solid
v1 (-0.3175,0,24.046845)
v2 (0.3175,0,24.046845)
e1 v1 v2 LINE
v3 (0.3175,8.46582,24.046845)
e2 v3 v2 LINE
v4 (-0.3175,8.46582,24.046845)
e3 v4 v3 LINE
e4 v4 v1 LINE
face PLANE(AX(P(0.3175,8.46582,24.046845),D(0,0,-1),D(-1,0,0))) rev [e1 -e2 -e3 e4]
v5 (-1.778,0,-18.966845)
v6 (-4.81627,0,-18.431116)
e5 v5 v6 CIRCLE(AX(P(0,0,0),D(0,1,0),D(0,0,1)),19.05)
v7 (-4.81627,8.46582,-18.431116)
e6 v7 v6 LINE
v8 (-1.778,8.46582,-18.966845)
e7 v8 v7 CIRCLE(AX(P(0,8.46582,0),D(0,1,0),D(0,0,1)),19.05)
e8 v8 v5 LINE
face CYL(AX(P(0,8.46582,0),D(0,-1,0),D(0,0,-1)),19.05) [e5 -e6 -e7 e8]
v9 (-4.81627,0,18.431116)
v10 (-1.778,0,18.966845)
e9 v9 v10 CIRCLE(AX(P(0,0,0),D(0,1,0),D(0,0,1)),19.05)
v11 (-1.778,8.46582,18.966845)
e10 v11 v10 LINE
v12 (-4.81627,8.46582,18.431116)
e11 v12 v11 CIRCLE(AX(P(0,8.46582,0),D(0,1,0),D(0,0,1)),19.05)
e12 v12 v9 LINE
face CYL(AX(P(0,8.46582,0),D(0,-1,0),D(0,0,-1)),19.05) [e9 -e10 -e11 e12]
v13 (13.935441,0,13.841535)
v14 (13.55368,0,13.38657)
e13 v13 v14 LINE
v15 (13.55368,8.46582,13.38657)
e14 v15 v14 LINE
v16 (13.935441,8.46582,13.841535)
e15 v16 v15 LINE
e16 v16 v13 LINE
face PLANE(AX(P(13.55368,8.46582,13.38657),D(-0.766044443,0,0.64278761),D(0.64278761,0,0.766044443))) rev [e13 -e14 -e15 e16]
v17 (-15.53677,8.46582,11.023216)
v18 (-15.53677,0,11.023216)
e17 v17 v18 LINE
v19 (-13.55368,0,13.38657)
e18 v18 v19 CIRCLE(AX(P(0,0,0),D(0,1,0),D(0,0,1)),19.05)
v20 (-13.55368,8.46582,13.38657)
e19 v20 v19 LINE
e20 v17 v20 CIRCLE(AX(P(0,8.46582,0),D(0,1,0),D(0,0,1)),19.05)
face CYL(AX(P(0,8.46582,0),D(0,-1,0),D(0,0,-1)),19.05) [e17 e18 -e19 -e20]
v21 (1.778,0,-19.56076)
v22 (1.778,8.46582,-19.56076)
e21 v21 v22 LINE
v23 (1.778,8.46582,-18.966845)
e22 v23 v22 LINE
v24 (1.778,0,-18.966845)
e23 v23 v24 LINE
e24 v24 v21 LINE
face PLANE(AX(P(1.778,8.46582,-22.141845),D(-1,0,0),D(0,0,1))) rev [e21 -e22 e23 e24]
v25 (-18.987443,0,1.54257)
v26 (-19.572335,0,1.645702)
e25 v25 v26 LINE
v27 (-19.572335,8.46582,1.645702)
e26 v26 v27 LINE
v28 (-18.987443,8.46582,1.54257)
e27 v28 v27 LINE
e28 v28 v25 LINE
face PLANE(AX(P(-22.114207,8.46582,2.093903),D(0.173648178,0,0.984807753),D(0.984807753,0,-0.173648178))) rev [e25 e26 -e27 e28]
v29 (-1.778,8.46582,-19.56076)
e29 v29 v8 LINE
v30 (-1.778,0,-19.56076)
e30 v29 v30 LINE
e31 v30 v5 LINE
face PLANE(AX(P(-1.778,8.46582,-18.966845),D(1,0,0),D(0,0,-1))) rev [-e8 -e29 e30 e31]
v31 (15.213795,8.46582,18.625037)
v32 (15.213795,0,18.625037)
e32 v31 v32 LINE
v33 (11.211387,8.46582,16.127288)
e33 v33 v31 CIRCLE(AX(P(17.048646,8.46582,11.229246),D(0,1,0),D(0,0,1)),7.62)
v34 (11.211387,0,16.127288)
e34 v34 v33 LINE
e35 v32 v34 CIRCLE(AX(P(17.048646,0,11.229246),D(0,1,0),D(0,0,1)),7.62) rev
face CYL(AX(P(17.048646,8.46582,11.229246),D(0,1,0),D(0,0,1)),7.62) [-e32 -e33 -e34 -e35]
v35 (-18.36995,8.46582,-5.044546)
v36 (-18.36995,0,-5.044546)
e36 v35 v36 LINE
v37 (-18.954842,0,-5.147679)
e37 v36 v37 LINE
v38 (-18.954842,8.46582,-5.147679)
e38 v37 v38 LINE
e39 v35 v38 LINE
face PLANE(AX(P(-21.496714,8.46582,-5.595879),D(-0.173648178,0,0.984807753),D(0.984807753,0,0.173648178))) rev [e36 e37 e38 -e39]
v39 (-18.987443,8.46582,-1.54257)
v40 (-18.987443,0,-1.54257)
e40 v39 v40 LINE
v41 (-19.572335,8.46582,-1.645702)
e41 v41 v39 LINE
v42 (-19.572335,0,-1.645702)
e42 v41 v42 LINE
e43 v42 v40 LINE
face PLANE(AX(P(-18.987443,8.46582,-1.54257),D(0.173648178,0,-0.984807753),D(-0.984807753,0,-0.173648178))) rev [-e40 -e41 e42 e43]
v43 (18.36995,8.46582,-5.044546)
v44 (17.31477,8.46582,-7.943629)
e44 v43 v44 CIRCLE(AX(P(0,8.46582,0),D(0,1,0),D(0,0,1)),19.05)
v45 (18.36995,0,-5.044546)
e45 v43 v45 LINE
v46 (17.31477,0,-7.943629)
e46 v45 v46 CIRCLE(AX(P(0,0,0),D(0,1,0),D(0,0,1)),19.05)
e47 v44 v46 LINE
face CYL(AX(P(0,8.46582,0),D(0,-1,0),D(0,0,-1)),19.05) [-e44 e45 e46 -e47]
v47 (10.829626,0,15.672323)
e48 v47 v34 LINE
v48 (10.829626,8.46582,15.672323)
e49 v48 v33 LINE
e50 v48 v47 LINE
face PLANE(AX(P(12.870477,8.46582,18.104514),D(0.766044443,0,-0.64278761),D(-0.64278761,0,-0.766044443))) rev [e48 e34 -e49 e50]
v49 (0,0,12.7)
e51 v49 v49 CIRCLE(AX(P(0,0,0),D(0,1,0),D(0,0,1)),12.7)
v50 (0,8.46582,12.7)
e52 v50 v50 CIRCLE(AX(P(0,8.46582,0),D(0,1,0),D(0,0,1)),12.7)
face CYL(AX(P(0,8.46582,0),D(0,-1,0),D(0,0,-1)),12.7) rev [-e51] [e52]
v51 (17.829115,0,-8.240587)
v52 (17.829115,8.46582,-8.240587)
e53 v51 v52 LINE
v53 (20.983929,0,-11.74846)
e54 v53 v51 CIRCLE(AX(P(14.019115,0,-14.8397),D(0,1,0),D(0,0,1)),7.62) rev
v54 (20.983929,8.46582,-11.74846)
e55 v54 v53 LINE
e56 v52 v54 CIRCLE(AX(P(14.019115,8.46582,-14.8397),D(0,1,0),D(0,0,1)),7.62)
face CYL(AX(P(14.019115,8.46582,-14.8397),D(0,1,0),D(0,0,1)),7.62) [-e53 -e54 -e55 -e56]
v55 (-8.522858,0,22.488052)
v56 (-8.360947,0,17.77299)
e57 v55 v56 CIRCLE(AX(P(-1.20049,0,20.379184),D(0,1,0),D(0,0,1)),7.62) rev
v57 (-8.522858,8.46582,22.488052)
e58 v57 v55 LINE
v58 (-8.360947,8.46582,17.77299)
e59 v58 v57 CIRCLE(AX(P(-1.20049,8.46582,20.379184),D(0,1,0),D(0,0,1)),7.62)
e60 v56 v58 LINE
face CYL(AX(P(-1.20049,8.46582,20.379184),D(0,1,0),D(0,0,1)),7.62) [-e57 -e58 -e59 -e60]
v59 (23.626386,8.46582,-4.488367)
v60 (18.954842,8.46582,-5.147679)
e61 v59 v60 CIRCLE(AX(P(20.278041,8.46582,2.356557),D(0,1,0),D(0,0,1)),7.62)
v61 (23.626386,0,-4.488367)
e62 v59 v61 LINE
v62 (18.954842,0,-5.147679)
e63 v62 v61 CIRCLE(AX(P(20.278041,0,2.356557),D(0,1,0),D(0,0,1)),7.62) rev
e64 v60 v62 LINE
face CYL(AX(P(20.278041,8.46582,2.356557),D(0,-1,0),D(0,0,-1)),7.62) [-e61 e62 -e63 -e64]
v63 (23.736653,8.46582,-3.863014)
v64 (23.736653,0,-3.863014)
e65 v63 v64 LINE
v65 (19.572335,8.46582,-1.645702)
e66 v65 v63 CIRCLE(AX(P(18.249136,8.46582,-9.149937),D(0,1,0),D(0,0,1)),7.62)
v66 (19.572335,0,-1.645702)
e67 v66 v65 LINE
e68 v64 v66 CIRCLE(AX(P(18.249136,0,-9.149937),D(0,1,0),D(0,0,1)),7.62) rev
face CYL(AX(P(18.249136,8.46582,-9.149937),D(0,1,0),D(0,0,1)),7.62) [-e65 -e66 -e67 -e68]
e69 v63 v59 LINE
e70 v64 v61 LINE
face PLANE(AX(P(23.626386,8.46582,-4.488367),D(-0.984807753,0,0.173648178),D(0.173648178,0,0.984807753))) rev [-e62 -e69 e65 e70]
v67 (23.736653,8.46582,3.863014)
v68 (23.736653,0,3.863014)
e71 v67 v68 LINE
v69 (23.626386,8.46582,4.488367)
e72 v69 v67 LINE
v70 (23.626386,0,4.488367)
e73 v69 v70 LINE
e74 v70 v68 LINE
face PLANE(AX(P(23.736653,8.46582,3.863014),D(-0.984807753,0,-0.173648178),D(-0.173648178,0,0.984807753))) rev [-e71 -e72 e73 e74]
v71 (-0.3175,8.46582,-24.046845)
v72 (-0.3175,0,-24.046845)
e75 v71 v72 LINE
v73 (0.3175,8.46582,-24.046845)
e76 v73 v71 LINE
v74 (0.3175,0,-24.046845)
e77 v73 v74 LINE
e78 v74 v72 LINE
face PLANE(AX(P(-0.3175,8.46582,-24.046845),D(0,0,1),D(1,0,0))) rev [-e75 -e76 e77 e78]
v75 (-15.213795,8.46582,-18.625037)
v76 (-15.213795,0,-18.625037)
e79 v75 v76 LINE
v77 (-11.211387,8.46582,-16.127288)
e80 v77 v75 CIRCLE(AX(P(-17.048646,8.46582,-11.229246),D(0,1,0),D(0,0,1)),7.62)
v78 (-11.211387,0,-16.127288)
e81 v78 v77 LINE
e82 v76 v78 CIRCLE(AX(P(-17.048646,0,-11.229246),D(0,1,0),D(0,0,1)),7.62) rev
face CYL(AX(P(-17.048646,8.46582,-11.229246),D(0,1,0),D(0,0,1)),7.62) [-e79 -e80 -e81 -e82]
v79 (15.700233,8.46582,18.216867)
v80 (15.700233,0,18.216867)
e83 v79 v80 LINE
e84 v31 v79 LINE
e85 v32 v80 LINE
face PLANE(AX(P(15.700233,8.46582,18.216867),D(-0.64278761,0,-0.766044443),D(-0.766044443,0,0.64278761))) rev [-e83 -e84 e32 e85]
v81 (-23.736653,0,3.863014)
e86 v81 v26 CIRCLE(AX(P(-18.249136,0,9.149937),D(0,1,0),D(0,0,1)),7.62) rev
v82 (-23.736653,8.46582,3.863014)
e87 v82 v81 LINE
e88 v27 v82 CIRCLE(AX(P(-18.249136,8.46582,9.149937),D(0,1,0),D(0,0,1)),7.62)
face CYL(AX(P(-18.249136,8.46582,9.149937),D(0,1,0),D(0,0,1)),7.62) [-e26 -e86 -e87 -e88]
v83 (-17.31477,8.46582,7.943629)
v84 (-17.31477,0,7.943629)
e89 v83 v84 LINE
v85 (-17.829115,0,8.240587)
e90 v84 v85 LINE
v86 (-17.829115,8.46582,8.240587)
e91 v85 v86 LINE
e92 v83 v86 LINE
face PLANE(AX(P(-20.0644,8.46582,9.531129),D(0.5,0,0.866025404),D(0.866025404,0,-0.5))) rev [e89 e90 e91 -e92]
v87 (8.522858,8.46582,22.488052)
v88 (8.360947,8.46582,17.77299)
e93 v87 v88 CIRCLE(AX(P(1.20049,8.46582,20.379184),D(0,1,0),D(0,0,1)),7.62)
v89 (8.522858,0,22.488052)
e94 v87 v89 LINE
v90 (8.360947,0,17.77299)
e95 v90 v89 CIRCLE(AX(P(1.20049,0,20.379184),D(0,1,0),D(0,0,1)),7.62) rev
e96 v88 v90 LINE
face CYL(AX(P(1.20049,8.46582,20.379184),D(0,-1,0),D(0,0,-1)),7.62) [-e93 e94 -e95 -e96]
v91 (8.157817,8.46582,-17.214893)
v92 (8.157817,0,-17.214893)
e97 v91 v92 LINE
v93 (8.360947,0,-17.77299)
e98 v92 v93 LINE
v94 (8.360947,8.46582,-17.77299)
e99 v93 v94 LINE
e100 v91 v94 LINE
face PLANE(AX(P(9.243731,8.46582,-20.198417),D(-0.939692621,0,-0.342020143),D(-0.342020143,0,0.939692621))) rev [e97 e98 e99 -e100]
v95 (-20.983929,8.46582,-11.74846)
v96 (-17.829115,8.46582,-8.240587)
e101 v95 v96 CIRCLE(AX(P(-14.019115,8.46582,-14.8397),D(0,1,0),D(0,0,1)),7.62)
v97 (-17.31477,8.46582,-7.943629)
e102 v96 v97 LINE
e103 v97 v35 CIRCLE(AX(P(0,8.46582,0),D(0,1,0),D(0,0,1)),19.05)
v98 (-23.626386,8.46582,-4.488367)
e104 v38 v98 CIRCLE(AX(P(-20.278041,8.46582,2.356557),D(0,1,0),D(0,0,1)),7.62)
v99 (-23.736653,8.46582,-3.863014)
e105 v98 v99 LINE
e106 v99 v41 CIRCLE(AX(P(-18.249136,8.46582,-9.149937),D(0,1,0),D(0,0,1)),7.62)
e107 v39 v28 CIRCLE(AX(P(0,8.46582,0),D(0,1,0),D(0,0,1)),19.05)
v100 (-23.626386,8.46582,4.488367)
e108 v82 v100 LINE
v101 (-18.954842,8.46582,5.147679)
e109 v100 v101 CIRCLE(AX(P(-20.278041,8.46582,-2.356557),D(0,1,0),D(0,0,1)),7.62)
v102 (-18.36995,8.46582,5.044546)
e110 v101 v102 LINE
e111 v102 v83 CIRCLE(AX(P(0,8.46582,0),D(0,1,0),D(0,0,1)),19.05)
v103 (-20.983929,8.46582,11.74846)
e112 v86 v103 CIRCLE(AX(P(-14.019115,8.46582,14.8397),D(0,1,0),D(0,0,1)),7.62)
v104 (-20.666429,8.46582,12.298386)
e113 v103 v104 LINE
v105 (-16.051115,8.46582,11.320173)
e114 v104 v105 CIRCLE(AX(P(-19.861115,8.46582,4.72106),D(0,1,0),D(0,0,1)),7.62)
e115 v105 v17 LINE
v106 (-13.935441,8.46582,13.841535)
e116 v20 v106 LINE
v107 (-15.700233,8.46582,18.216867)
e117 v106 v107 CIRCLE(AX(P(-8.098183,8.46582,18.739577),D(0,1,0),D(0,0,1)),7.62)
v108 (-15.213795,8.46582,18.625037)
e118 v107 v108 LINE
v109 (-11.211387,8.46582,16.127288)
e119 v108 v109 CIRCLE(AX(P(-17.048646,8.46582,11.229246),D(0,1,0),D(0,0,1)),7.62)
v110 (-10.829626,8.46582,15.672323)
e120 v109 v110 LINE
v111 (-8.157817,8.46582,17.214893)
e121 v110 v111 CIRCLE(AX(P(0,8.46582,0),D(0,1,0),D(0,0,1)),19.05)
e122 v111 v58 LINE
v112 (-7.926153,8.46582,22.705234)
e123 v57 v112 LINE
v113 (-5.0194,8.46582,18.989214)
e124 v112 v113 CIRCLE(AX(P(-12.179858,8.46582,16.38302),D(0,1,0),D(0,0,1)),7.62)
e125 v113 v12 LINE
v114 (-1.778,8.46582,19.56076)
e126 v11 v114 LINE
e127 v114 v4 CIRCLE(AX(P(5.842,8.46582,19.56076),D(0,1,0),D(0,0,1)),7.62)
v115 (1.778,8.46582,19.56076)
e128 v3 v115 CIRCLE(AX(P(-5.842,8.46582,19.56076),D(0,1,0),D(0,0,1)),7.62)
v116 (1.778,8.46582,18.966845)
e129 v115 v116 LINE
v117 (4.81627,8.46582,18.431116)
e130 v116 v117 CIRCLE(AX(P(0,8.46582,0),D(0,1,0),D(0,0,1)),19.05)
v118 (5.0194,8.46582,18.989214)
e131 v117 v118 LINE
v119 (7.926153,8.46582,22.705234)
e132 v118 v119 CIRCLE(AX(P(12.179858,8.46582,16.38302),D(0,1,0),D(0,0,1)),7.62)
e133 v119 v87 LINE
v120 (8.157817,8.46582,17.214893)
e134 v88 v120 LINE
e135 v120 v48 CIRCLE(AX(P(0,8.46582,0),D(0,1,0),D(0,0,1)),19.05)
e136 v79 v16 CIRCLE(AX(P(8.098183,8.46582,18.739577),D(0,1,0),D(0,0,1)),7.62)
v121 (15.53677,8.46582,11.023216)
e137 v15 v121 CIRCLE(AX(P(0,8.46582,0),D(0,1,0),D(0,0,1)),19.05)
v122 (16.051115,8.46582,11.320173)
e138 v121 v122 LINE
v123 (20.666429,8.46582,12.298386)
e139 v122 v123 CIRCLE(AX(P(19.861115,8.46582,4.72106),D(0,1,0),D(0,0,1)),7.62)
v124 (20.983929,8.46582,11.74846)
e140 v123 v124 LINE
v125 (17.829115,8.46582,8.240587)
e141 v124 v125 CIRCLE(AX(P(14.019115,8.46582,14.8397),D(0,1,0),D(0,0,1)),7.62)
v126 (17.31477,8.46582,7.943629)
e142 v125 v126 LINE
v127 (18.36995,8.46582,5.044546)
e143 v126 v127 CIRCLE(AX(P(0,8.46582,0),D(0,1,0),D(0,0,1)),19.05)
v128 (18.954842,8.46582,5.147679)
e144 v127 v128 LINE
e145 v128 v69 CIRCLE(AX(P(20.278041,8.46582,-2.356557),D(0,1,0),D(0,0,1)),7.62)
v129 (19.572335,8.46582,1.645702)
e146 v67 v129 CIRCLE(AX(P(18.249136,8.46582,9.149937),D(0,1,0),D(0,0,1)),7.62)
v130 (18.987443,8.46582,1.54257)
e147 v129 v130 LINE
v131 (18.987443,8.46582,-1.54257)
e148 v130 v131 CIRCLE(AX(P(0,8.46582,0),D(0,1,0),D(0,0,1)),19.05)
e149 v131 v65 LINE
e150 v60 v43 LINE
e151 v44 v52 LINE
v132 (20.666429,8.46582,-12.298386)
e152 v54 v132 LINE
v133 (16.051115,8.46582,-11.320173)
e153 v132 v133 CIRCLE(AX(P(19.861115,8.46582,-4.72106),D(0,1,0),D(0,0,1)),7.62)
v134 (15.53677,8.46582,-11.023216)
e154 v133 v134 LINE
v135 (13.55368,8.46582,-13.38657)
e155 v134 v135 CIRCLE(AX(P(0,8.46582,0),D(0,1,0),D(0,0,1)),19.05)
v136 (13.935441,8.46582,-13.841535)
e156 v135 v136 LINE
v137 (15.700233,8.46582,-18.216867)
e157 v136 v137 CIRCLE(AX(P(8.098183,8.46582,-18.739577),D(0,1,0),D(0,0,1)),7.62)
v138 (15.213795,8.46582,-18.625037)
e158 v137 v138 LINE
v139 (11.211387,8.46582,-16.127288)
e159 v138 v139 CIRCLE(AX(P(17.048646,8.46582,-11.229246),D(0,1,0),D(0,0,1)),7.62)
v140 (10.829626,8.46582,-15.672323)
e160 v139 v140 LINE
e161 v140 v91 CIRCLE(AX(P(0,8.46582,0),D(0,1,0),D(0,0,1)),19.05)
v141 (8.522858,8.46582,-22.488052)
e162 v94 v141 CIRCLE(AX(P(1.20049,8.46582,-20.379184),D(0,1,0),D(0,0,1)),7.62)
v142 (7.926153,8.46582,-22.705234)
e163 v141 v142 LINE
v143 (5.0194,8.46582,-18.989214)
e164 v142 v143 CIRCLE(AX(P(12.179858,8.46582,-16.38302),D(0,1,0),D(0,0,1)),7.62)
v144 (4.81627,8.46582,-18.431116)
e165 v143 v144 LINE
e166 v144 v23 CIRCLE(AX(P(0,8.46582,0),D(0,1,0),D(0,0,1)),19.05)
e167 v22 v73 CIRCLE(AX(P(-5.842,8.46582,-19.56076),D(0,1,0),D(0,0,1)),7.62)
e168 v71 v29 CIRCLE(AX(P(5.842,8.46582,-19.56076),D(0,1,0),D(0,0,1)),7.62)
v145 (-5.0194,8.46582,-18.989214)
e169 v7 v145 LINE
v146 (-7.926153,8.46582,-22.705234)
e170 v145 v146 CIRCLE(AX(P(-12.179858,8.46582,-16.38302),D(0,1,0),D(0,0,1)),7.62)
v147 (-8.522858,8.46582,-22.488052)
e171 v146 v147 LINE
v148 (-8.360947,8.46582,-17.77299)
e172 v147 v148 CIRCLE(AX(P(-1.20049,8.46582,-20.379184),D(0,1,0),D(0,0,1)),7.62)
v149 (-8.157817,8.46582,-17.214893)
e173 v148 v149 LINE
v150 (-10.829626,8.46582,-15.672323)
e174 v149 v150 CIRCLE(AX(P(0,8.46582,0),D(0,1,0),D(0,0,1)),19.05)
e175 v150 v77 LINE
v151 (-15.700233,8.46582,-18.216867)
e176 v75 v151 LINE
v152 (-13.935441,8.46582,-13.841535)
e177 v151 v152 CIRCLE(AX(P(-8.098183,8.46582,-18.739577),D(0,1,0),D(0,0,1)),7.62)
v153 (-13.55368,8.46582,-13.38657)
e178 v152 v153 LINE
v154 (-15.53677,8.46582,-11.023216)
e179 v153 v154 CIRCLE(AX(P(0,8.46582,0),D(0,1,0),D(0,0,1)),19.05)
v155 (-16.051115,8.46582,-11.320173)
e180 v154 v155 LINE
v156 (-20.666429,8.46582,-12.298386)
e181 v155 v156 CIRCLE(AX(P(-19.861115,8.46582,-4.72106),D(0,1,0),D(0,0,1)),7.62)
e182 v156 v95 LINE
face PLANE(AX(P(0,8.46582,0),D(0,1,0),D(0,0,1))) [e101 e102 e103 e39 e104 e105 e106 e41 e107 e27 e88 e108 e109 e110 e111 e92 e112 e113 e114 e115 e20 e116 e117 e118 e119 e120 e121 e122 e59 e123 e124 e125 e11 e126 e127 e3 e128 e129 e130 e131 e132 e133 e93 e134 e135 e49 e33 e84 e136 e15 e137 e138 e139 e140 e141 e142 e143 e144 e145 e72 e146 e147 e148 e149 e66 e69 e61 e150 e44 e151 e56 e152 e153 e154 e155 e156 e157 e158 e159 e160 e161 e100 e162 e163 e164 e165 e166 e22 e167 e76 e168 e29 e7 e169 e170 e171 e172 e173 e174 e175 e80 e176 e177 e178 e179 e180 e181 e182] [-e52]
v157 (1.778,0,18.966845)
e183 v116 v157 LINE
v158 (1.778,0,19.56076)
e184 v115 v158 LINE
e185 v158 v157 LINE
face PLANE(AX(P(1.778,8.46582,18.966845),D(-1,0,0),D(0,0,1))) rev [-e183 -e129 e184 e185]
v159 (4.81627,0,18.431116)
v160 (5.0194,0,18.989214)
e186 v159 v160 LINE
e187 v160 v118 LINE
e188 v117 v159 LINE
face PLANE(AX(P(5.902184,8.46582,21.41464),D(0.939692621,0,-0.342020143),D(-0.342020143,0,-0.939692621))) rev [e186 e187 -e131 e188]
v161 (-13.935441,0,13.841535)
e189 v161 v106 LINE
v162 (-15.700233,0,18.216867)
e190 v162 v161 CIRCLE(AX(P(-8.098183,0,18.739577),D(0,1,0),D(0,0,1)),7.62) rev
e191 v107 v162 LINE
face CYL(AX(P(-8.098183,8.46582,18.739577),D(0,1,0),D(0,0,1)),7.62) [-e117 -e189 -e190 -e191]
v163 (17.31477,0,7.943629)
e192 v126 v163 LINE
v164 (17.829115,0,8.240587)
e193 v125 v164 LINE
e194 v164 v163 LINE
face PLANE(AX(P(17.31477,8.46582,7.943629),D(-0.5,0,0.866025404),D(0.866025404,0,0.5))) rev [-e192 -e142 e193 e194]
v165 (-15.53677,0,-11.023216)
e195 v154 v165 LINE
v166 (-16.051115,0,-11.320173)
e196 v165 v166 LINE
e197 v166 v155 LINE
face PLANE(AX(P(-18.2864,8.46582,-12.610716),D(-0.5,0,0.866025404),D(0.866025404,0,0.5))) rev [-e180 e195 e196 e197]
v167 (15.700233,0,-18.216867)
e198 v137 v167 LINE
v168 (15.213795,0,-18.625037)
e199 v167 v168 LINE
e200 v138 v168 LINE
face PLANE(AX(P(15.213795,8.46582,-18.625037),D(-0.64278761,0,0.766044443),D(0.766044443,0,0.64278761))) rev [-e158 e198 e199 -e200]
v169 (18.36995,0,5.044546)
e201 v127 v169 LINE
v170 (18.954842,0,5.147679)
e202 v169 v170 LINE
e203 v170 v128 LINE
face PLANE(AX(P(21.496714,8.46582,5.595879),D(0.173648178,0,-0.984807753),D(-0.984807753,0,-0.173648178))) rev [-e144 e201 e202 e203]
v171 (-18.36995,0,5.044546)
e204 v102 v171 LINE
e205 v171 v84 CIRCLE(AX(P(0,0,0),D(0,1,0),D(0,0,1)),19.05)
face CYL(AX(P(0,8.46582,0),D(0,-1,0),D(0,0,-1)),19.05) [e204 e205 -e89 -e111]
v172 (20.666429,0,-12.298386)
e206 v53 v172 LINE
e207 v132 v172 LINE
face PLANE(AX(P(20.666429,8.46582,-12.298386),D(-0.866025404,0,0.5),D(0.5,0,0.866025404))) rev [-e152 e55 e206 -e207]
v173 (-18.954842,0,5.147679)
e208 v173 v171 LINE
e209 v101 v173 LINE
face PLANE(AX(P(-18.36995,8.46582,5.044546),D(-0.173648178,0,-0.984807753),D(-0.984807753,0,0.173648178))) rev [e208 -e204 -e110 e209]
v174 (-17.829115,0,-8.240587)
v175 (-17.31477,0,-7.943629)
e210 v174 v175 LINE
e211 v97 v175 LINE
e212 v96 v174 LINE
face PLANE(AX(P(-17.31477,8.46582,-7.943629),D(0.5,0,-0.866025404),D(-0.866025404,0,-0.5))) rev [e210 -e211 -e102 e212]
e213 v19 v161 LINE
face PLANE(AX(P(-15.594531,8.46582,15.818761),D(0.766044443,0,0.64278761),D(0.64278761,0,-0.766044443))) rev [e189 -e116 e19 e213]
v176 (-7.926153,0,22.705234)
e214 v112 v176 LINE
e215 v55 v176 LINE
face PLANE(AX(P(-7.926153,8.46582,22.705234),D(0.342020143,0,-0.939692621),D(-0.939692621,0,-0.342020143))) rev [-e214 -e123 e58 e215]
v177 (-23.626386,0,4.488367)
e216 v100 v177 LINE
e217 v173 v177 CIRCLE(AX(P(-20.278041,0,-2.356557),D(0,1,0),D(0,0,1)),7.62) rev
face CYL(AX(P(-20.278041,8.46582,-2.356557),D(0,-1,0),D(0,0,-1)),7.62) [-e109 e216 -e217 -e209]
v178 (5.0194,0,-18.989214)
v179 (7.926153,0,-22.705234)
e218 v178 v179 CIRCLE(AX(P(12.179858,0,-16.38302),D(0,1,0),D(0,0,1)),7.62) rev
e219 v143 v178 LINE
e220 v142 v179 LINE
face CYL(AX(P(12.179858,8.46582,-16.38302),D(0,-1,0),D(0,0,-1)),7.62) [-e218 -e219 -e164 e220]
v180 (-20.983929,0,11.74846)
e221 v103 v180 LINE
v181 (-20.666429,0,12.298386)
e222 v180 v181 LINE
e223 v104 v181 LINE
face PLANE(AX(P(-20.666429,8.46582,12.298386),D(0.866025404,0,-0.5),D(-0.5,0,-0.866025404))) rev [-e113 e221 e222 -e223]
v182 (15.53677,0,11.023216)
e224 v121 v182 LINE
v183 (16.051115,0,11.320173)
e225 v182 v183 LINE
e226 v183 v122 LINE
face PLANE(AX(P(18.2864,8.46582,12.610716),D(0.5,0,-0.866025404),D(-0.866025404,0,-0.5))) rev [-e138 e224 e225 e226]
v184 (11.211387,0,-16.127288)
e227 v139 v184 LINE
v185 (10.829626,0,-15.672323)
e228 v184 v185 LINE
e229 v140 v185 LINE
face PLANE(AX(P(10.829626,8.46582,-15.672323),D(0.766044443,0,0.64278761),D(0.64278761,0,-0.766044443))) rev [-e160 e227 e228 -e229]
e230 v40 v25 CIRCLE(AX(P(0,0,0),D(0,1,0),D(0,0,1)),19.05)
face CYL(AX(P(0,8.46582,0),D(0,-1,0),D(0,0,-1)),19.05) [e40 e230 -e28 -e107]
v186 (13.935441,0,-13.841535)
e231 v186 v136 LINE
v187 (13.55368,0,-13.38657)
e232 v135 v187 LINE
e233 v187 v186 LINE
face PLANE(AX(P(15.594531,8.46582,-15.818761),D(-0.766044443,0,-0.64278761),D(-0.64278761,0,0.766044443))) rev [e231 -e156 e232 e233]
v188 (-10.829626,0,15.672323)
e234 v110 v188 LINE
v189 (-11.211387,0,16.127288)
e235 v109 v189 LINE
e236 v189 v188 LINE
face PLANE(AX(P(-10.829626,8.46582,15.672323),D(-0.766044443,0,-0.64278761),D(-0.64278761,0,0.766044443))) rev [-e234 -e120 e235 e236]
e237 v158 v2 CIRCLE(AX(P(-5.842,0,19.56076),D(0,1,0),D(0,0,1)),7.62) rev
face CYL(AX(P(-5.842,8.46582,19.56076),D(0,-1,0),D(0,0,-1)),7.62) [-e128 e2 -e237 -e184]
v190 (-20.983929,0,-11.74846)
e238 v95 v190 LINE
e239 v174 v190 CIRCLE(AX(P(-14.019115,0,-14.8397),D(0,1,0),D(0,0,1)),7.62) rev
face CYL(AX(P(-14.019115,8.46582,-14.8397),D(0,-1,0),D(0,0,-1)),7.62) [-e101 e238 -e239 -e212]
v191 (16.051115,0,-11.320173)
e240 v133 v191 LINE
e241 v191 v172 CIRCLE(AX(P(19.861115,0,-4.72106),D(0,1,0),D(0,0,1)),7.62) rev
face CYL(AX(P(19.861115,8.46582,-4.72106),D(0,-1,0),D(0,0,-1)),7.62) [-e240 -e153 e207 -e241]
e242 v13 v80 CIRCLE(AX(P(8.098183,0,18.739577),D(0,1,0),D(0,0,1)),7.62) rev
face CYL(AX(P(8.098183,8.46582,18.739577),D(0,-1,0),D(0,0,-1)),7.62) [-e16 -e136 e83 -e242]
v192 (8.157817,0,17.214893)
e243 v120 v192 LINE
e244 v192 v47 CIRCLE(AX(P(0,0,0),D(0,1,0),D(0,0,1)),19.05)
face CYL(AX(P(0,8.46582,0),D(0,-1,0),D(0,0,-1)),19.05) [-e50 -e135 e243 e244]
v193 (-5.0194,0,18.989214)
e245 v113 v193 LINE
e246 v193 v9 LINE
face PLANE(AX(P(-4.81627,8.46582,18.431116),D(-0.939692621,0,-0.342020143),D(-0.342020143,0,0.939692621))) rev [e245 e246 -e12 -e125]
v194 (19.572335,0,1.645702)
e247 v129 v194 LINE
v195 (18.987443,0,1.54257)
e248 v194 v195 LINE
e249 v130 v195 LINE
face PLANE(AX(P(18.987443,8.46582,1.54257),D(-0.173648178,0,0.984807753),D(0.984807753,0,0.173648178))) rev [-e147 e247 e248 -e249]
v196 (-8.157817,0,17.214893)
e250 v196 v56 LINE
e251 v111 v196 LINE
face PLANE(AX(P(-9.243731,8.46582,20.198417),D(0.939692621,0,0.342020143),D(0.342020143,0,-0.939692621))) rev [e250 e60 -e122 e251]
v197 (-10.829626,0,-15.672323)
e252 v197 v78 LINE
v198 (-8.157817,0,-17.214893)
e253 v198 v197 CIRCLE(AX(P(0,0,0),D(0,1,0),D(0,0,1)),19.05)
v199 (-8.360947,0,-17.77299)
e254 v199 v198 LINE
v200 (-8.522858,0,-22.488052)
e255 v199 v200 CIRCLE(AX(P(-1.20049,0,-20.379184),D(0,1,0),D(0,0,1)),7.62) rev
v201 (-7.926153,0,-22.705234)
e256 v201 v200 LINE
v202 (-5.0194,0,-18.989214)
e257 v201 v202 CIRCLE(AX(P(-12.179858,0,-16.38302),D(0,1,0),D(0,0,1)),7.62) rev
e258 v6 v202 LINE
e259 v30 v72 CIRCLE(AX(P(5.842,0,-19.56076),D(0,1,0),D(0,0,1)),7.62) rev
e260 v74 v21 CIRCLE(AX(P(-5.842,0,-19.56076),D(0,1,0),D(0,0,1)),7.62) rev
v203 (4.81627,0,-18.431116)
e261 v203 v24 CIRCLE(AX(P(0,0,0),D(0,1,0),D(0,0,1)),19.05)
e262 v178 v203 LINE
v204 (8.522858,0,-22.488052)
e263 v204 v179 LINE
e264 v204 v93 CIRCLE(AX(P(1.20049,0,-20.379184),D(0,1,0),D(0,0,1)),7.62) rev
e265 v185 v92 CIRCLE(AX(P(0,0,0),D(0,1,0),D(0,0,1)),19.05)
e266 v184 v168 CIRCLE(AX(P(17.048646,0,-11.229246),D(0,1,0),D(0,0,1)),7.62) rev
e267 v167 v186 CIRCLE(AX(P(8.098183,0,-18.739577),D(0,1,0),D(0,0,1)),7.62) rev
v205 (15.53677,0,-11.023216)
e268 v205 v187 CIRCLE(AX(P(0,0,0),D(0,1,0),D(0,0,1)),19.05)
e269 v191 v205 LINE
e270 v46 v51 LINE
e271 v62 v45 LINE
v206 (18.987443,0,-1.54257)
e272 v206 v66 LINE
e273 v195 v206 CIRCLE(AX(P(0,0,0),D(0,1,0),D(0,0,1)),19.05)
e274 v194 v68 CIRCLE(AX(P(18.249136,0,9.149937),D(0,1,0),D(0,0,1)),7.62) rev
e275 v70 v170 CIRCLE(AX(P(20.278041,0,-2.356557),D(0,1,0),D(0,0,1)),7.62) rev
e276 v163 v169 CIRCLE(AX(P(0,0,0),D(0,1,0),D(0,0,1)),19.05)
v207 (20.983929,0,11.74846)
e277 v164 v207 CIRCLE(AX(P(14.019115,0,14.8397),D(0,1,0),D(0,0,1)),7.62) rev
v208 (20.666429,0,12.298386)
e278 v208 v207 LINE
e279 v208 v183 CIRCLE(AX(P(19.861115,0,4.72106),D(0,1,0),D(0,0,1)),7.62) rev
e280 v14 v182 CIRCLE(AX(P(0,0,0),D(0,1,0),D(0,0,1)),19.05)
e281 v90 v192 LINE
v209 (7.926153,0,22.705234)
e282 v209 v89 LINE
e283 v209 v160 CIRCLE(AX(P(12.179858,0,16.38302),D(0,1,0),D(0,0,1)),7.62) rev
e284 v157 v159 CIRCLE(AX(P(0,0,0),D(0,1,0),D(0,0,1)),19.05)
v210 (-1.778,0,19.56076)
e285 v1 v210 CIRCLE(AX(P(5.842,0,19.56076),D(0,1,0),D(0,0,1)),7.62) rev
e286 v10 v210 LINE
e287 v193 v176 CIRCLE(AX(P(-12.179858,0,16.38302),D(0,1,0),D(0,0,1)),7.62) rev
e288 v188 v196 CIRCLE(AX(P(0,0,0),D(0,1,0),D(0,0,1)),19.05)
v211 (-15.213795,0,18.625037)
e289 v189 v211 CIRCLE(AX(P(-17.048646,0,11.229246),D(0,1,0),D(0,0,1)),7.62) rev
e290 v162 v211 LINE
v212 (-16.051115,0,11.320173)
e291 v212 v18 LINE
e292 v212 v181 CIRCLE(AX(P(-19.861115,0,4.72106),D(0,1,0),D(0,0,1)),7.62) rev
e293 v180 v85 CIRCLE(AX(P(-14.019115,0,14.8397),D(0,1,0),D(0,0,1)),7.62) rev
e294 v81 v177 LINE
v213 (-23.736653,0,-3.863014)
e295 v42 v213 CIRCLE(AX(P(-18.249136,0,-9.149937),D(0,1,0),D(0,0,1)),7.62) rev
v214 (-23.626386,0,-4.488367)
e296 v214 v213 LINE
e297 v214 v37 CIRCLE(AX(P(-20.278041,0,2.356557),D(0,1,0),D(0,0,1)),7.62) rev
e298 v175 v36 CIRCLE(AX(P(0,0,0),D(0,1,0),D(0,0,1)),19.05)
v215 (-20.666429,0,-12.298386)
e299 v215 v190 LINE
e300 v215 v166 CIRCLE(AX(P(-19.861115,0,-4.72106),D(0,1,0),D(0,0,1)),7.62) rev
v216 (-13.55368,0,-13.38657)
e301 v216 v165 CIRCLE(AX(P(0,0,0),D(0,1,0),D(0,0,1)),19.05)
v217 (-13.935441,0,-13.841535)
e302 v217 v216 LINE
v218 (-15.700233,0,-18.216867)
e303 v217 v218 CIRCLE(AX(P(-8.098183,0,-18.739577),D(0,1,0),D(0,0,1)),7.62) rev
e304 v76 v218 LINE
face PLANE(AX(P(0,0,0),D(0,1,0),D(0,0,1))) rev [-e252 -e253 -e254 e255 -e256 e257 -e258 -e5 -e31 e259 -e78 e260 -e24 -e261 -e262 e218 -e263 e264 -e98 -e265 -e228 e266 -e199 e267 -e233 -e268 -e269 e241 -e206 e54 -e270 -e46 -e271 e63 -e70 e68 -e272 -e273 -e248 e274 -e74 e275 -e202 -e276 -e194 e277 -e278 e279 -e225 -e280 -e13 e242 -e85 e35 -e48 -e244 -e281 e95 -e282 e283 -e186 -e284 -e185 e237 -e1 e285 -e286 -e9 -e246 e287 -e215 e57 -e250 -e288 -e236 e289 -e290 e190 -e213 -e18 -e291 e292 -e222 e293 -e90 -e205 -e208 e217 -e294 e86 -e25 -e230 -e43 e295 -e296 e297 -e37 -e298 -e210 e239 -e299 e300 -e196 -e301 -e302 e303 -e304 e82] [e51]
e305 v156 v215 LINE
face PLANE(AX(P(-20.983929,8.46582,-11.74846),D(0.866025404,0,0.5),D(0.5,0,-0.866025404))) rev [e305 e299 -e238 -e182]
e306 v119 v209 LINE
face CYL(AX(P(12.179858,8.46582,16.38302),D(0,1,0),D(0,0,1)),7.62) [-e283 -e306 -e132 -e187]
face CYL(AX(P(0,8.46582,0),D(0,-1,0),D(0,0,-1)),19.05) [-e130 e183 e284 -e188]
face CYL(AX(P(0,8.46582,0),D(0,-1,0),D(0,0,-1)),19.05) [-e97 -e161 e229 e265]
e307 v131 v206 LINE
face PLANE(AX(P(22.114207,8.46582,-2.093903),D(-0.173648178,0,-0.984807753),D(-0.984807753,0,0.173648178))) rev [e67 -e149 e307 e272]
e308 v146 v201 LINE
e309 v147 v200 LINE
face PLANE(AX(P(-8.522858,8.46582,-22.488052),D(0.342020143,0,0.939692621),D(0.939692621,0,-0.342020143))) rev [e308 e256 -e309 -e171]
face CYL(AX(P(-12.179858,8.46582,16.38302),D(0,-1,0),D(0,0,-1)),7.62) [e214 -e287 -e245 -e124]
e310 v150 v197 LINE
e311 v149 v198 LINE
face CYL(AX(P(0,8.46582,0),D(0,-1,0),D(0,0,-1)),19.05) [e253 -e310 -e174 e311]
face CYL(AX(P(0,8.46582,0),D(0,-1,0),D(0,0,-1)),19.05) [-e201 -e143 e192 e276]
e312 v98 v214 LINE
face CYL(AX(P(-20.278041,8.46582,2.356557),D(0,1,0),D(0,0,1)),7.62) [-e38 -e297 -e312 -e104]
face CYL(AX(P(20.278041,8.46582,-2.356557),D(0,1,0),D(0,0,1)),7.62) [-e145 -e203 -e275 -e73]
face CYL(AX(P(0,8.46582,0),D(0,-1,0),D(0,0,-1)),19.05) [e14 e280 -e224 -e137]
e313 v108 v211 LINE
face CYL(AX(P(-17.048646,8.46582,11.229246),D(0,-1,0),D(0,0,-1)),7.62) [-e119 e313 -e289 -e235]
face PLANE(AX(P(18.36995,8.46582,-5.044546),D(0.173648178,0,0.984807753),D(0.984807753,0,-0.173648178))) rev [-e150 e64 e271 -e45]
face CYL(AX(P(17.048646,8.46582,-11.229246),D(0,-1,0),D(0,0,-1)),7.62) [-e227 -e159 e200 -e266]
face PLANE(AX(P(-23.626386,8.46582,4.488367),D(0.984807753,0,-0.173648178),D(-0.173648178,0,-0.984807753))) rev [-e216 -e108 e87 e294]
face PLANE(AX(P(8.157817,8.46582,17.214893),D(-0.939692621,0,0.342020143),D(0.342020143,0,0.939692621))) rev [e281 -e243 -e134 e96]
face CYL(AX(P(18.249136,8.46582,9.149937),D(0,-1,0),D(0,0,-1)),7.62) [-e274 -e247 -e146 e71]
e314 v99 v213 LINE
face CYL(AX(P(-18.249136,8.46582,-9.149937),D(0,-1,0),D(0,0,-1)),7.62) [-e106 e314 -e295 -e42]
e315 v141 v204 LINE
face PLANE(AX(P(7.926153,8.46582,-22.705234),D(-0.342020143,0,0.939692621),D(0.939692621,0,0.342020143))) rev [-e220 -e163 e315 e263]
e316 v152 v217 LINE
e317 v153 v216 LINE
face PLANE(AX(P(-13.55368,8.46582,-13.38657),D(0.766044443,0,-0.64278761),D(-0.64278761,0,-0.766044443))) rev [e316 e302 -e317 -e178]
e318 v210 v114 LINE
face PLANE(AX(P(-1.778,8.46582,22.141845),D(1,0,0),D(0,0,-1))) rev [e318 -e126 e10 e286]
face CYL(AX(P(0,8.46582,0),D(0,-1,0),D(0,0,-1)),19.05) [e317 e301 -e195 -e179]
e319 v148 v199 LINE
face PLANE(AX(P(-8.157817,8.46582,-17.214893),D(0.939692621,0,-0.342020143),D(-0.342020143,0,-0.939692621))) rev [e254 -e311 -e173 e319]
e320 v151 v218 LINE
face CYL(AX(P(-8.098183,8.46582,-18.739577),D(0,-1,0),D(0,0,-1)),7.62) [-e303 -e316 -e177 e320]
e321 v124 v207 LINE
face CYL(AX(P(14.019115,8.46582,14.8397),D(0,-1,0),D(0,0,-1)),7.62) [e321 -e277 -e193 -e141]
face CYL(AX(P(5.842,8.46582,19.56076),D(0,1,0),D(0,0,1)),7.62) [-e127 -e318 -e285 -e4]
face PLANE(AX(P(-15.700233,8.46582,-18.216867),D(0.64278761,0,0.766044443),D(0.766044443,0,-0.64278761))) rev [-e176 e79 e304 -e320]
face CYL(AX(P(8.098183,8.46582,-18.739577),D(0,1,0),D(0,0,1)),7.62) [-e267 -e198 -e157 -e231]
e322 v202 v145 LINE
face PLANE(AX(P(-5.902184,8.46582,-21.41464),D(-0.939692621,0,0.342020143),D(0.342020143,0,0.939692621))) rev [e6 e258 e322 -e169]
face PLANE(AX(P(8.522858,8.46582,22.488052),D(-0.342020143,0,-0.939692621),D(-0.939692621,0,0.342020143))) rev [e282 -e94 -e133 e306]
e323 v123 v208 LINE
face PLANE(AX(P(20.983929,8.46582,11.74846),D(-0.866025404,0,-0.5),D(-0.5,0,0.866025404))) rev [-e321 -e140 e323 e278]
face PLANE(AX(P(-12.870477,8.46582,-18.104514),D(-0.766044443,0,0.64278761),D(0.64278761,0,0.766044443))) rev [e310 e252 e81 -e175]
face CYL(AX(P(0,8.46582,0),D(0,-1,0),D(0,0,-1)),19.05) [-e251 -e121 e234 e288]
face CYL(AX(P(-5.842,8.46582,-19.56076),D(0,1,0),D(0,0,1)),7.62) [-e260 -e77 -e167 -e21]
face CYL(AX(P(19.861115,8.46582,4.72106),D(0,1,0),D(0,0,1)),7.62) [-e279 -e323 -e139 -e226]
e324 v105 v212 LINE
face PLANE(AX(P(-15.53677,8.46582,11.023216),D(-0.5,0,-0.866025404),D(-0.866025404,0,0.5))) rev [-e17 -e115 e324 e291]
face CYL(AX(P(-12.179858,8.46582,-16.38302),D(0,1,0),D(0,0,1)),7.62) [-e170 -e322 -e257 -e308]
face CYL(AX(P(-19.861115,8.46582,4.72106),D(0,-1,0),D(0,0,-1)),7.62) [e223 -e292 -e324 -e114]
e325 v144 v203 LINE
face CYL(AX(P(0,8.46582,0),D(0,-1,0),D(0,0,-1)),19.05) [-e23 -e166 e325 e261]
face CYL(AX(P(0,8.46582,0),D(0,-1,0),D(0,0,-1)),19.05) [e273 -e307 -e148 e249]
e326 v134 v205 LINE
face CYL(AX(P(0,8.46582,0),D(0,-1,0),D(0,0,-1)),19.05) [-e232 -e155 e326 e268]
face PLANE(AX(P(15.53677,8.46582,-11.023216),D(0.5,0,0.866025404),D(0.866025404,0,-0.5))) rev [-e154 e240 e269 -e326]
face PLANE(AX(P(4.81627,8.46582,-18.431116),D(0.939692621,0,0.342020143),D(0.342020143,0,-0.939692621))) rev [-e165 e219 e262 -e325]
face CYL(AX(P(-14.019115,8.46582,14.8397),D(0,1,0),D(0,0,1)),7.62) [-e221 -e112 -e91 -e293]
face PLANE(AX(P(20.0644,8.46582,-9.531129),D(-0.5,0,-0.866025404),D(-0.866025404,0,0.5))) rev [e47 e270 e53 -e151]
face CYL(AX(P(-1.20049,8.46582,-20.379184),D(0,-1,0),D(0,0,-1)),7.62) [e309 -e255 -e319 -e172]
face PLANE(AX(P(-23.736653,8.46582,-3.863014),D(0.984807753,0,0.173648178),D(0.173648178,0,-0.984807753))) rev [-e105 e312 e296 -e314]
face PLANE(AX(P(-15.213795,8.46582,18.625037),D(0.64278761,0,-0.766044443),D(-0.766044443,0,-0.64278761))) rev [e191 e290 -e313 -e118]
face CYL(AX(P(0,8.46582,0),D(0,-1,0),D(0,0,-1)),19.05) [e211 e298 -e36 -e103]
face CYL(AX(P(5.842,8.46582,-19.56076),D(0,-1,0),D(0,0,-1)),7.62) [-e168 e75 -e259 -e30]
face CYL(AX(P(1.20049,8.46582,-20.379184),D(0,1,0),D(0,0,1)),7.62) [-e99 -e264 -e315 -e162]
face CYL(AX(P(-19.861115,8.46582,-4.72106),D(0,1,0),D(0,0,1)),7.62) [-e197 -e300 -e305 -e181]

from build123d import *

# Parameters (mm, degrees)
SKETCH1_R           = 19.05
SKETCH1_R_2         = 12.7
BOSS_EXTRUDE1_DEPTH = 8.46582
BOSS_EXTRUDE2_DEPTH = 8.46582
CIRPATTERN1_COUNT   = 18
FILLET2_R           = 7.62


with BuildPart() as part:
    # Sketch1 → Boss-Extrude1 (new body)
    with BuildSketch(Plane(origin=(0, 0, 0), x_dir=(1, 0, 0), z_dir=(0, 1, 0))):
        with Locations(Location((0, 0, 0), (0, 0, 270))):
            Circle(SKETCH1_R)
        with Locations(Location((0, 0, 0), (0, 0, 270))):
            Circle(SKETCH1_R_2, mode=Mode.SUBTRACT)
    extrude(amount=BOSS_EXTRUDE1_DEPTH)

    # Sketch2 → Boss-Extrude2 (add)
    with BuildSketch(Plane(origin=(0, 0, 0), x_dir=(1, 0, 0), z_dir=(0, 1, 0))):
        with BuildLine():
            Line((-1.778, 18.966845178), (-1.778, 22.141845178))
            Line((-1.778, 22.141845178), (-0.3175, 24.046845178))
            Line((-0.3175, 24.046845178), (0.3175, 24.046845178))
            Line((0.3175, 24.046845178), (1.778, 22.141845178))
            Line((1.778, 22.141845178), (1.778, 18.966845178))
            ThreePointArc((1.778, 18.966845178), (0, 19.05), (-1.778, 18.966845178))
        make_face()
    boss_extrude2 = extrude(amount=BOSS_EXTRUDE2_DEPTH)

    # CirPattern1: Boss-Extrude2 ×18 about axis
    cirpattern1_axis = Axis((0, 0, 0), (0, 1, 0))
    for i in range(1, CIRPATTERN1_COUNT):
        add(boss_extrude2.rotate(cirpattern1_axis, i * 360 / CIRPATTERN1_COUNT))

    # Fillet2
    # the kernel refuses this fillet: 7.62 mm, written as the material it takes off along each edge
    with BuildSketch(Plane(origin=(1.778, -6.452712813, -22.141845178), x_dir=(0, 0, 1), z_dir=(0, 1, 0)), Plane(origin=(20.064400411, -6.452712813, -9.531129421), x_dir=(-0.8660254037844388, 0, 0.49999999999999956), z_dir=(0, 1, 0)), Plane(origin=(22.114207257, -6.452712813, -2.09390288), x_dir=(-0.9848077530122081, 0, 0.17364817766693005), z_dir=(0, 1, 0)), Plane(origin=(21.496714337, -6.452712813, 5.59587925), x_dir=(-0.9848077530122081, 0, -0.17364817766692997), z_dir=(0, 1, 0)), Plane(origin=(18.286400411, -6.452712813, 12.610715757), x_dir=(-0.8660254037844383, 0, -0.5000000000000006), z_dir=(0, 1, 0)), Plane(origin=(12.870476716, -6.452712813, 18.104513829), x_dir=(-0.6427876096865391, 0, -0.7660444431189781), z_dir=(0, 1, 0)), Plane(origin=(5.902183581, -6.452712813, 21.414640339), x_dir=(-0.34202014332566927, 0, -0.9396926207859082), z_dir=(0, 1, 0)), Plane(origin=(-1.778, -6.452712813, 22.141845178), x_dir=(0, 0, -1), z_dir=(0, 1, 0)), Plane(origin=(-9.243730541, -6.452712813, 20.198416709), x_dir=(0.34202014332566927, 0, -0.9396926207859082), z_dir=(0, 1, 0)), Plane(origin=(-15.594530756, -6.452712813, 15.818761089), x_dir=(0.6427876096865394, 0, -0.7660444431189781), z_dir=(0, 1, 0)), Plane(origin=(-20.064400411, -6.452712813, 9.531129421), x_dir=(0.8660254037844388, 0, -0.49999999999999956), z_dir=(0, 1, 0)), Plane(origin=(-22.114207257, -6.452712813, 2.09390288), x_dir=(0.984807753012208, 0, -0.17364817766693053), z_dir=(0, 1, 0)), Plane(origin=(-21.496714337, -6.452712813, -5.59587925), x_dir=(0.9848077530122081, 0, 0.17364817766693055), z_dir=(0, 1, 0)), Plane(origin=(15.594530756, -6.452712813, -15.818761089), x_dir=(-0.6427876096865398, 0, 0.7660444431189776), z_dir=(0, 1, 0)), Plane(origin=(-18.286400411, -6.452712813, -12.610715757), x_dir=(0.8660254037844386, 0, 0.5000000000000001), z_dir=(0, 1, 0)), Plane(origin=(-12.870476716, -6.452712813, -18.104513829), x_dir=(0.642787609686539, 0, 0.7660444431189781), z_dir=(0, 1, 0)), Plane(origin=(9.243730541, -6.452712813, -20.198416709), x_dir=(-0.3420201433256689, 0, 0.9396926207859084), z_dir=(0, 1, 0)), Plane(origin=(-5.902183581, -6.452712813, -21.414640339), x_dir=(0.3420201433256684, 0, 0.9396926207859084), z_dir=(0, 1, 0))) as fillet2_piece_1:
        with BuildLine():
            CenterArc((2.581085125, -7.62), FILLET2_R, 90, 36.06658826)
            Line((-1.905, -1.4605), (-1.994721703, -1.33731))
            ThreePointArc((-1.994721703, -1.33731), (-1.045224967, -0.609304391), (-0.092724967, 0.120945609))
            Line((-0.092724967, 0.120945609), (0, 0.1524))
            Line((0, 0.1524), (2.581085125, 0.1524))
            Line((2.581085125, 0.1524), (2.581085125, 0))
        make_face()
    extrude(amount=21.371245626, mode=Mode.SUBTRACT)
    with BuildSketch(Plane(origin=(-1.778, -6.452712813, -22.141845178), x_dir=(0.6084315436571524, 0, -0.7936063612919032), z_dir=(0, 1, 0)), Plane(origin=(22.114207257, -6.452712813, 2.09390288), x_dir=(0.6758966686489332, 0, 0.7369963997939708), z_dir=(0, 1, 0)), Plane(origin=(21.496714337, -6.452712813, -5.59587925), x_dir=(0.8872027262312159, 0, 0.4613798029475262), z_dir=(0, 1, 0)), Plane(origin=(20.064400411, -6.452712813, 9.531129421), x_dir=(0.38306749765514664, 0, 0.9237203539168248), z_dir=(0, 1, 0)), Plane(origin=(15.594530756, -6.452712813, 15.818761089), x_dir=(0.04403473296999355, 0, 0.9990300006968066), z_dir=(0, 1, 0)), Plane(origin=(9.243730541, -6.452712813, 20.198416709), x_dir=(-0.30030927039478544, 0, 0.9538418852802342), z_dir=(0, 1, 0)), Plane(origin=(1.778, -6.452712813, 22.141845178), x_dir=(-0.6084315436571494, 0, 0.7936063612919054), z_dir=(0, 1, 0)), Plane(origin=(-5.902183581, -6.452712813, 21.414640339), x_dir=(-0.8431679932612217, 0, 0.5376501977492841), z_dir=(0, 1, 0)), Plane(origin=(-12.870476716, -6.452712813, 18.104513829), x_dir=(-0.9762059390437181, 0, 0.21684548548626165), z_dir=(0, 1, 0)), Plane(origin=(-18.286400411, -6.452712813, 12.610715757), x_dir=(-0.9914990413122959, 0, -0.1301139926249219), z_dir=(0, 1, 0)), Plane(origin=(-21.496714337, -6.452712813, 5.59587925), x_dir=(-0.8872027262312162, 0, -0.4613798029475256), z_dir=(0, 1, 0)), Plane(origin=(-22.114207257, -6.452712813, -2.09390288), x_dir=(-0.675896668648932, 0, -0.7369963997939716), z_dir=(0, 1, 0)), Plane(origin=(-20.064400411, -6.452712813, -9.531129421), x_dir=(-0.3830674976551464, 0, -0.923720353916825), z_dir=(0, 1, 0)), Plane(origin=(-15.594530756, -6.452712813, -15.818761089), x_dir=(-0.04403473296998761, 0, -0.9990300006968068), z_dir=(0, 1, 0)), Plane(origin=(12.870476716, -6.452712813, -18.104513829), x_dir=(0.9762059390437176, 0, -0.21684548548626464), z_dir=(0, 1, 0)), Plane(origin=(18.286400411, -6.452712813, -12.610715757), x_dir=(0.9914990413122965, 0, 0.13011399262491774), z_dir=(0, 1, 0))) as fillet2_piece_2:
        with BuildLine():
            CenterArc((2.587882788, -7.61769408), FILLET2_R, 91.409591302, 36.06658826)
            Line((-2.048365574, -1.570413607), (-2.141090542, -1.449467998))
            Line((-2.141090542, -1.449467998), (-0.092724967, 0.120945609))
            Line((-0.092724967, 0.120945609), (0, 0.1524))
            ThreePointArc((0, 0.1524), (1.200217194, 0.1524), (2.39668542, 0.152353882))
            Line((2.39668542, 0.152353882), (2.400434388, 0))
        make_face()
    extrude(amount=21.371245626, mode=Mode.SUBTRACT)
    with BuildSketch(Plane(origin=(-9.243730541, -6.452712813, -20.198416709), x_dir=(0.34202014332566855, 0, 0.9396926207859084), z_dir=(0, 1, 0)), Plane(origin=(5.902183581, -6.452712813, -21.414640339), x_dir=(-0.34202014332566877, 0, 0.9396926207859084), z_dir=(0, 1, 0))) as fillet2_piece_3:
        with BuildLine():
            CenterArc((2.581085125, 7.62), FILLET2_R, 233.93341174, 36.06658826)
            Line((-1.905, 1.4605), (-1.994721703, 1.33731))
            ThreePointArc((-1.994721703, 1.33731), (-1.045224967, 0.609304391), (-0.092724967, -0.120945609))
            Line((-0.092724967, -0.120945609), (0, -0.1524))
            Line((0, -0.1524), (2.581085125, -0.1524))
            Line((2.581085125, -0.1524), (2.581085125, 0))
        make_face()
    extrude(amount=21.371245626, mode=Mode.SUBTRACT)


solid = part.part
